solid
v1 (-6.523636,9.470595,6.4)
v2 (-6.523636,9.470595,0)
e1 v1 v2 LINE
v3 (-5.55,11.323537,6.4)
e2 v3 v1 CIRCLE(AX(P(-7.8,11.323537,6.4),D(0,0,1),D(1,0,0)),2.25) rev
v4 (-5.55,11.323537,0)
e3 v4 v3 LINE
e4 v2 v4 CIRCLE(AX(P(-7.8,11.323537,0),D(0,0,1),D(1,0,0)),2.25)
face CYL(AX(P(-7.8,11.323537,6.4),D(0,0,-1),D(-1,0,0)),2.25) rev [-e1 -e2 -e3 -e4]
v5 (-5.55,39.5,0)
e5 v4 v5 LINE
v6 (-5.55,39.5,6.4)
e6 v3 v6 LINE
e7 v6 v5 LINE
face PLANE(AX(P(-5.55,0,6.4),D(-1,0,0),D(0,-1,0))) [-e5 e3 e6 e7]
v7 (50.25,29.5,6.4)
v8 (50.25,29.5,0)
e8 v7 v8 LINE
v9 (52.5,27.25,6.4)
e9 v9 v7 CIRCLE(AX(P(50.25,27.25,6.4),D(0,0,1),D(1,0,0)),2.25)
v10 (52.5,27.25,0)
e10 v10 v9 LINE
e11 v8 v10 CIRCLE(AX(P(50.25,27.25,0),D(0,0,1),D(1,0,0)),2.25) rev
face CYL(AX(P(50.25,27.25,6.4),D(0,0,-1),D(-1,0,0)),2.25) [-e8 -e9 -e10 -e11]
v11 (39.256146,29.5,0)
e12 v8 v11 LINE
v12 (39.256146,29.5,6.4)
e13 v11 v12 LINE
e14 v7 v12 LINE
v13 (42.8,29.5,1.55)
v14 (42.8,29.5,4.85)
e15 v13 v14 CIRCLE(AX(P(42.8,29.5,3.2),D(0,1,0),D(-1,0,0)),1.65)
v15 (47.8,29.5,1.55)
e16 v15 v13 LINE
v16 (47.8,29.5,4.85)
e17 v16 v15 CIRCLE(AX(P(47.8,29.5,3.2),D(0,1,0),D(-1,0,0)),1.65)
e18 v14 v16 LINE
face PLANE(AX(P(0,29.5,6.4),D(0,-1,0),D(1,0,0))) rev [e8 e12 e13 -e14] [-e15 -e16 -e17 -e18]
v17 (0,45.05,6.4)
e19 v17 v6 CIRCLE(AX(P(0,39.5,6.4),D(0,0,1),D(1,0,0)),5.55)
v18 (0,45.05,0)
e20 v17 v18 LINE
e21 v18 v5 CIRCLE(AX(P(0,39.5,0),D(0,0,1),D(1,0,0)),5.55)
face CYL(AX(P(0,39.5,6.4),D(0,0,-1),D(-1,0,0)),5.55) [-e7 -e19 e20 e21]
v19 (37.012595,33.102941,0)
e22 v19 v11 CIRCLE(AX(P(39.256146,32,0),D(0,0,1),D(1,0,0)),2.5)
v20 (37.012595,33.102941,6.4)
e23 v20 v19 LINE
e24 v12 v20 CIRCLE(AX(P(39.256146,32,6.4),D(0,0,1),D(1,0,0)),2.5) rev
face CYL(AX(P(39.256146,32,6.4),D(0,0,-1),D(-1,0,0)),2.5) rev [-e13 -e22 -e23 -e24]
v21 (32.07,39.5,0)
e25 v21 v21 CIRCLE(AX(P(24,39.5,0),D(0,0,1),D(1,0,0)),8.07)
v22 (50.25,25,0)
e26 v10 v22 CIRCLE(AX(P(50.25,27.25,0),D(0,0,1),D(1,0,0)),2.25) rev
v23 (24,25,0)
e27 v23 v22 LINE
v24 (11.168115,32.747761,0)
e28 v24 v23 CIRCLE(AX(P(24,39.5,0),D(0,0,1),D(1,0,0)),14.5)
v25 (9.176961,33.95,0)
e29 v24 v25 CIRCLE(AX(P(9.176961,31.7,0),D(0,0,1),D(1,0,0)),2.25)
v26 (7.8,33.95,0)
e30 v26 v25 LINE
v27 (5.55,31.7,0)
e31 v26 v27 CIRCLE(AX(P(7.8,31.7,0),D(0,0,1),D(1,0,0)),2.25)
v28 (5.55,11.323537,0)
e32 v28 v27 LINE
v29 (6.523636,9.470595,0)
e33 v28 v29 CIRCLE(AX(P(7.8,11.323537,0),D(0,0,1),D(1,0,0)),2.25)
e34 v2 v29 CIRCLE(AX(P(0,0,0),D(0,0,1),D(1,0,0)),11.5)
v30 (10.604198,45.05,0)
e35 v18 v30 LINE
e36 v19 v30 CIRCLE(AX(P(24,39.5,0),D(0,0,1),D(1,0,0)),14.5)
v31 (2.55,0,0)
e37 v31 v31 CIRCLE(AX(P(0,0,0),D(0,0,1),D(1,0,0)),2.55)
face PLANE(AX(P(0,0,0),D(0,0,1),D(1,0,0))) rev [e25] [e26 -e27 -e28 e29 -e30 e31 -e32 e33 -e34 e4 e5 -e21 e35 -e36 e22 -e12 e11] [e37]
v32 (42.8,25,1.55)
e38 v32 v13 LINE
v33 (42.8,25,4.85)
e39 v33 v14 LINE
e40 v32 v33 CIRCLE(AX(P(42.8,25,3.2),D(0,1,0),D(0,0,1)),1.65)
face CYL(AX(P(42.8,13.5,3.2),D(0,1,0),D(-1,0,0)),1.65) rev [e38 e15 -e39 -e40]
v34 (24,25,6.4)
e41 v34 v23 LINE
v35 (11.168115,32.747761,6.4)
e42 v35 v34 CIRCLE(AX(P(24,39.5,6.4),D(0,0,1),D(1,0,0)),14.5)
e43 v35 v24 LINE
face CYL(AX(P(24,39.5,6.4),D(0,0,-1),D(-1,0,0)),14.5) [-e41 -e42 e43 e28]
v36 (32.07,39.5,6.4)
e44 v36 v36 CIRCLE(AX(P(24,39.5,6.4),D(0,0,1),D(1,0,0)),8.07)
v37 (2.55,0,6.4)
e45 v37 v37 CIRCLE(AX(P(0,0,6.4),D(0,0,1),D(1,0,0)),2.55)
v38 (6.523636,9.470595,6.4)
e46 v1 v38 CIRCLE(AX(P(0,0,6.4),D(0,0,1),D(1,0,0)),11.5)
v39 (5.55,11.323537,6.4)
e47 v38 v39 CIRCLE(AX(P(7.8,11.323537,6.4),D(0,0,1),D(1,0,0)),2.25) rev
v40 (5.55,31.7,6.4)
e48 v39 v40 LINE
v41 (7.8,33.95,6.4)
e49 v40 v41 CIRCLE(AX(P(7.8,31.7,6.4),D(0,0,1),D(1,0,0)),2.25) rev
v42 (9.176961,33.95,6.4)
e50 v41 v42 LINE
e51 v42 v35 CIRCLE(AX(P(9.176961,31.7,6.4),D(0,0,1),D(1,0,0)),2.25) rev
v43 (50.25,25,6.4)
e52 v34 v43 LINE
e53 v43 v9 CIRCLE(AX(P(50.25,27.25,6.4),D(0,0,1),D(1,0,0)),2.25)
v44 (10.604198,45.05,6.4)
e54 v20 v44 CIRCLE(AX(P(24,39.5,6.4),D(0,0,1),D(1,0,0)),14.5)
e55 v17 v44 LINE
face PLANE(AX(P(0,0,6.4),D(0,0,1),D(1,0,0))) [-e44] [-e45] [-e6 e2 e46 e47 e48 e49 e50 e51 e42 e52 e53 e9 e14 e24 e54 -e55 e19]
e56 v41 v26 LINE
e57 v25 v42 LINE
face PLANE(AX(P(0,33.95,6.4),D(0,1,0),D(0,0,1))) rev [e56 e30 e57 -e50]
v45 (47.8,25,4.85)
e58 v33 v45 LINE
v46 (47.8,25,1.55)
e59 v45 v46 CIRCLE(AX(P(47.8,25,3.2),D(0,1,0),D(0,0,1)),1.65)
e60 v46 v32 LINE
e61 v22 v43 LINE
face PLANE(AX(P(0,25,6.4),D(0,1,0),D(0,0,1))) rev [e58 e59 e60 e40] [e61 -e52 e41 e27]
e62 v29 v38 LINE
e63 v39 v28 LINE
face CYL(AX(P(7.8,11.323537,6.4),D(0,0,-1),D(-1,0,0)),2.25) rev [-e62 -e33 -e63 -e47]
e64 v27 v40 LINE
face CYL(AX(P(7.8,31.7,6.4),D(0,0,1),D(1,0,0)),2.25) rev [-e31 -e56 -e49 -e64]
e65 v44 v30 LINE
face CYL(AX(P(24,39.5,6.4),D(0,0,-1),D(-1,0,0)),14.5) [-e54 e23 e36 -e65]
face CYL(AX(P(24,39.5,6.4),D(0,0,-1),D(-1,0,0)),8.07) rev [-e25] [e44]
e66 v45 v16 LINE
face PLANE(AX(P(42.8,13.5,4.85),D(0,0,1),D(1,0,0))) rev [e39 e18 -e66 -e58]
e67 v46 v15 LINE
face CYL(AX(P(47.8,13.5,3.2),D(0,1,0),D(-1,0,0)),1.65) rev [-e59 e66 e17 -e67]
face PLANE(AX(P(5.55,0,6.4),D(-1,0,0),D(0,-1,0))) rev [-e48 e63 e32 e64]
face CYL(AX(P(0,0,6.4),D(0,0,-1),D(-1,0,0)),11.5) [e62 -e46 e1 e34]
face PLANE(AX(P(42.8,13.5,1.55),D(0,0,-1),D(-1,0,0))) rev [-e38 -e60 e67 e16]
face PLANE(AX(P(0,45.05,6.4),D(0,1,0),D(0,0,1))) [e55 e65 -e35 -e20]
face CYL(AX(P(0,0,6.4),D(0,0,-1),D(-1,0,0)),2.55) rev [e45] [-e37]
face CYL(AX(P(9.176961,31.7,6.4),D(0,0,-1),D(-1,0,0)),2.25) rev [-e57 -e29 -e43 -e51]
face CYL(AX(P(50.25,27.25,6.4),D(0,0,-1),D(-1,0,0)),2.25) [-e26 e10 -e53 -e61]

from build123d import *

# Parameters (mm, degrees)
SKETCH1_R           = 2.55
SKETCH1_R_2         = 8.07
BOSS_EXTRUDE3_DEPTH = 6.4
CUT_EXTRUDE1_DEPTH  = 16
FILLET1_R           = 2.5
FILLET2_R           = 2.25


with BuildPart() as part:
    # Sketch1 → Boss-Extrude3 (new body)
    with BuildSketch(Plane.XY):
        with BuildLine():
            ThreePointArc((-5.55, 10.072114972), (0, -11.5), (5.55, 10.072114972))
            Line((5.55, 10.072114972), (5.55, 33.95))
            Line((5.55, 33.95), (10.604198419, 33.95))
            ThreePointArc((10.604198419, 33.95), (15.944722227, 27.443362824), (24, 25))
            Line((24, 25), (52.5, 25))
            Line((52.5, 25), (52.5, 29.5))
            Line((52.5, 29.5), (34.5, 29.5))
            ThreePointArc((34.5, 29.5), (31.908668769, 51.65331059), (10.604198419, 45.05))
            Line((10.604198419, 45.05), (0, 45.05))
            ThreePointArc((0, 45.05), (-3.924442636, 43.424442636), (-5.55, 39.5))
            Line((-5.55, 39.5), (-5.55, 10.072114972))
        make_face()
        Circle(SKETCH1_R, mode=Mode.SUBTRACT)
        with Locations((24, 39.5)):
            Circle(SKETCH1_R_2, mode=Mode.SUBTRACT)
    extrude(amount=BOSS_EXTRUDE3_DEPTH)

    # Sketch2 → Cut-Extrude1 (cut)
    with BuildSketch(Plane(origin=(0, 29.5, 0), x_dir=(1, 0, 0), z_dir=(0, 1, 0))):
        with BuildLine():
            Line((42.8, -1.55), (47.8, -1.55))
            ThreePointArc((47.8, -1.55), (49.45, -3.2), (47.8, -4.85))
            Line((47.8, -4.85), (42.8, -4.85))
            ThreePointArc((42.8, -4.85), (41.15, -3.2), (42.8, -1.55))
        make_face()
    extrude(amount=-CUT_EXTRUDE1_DEPTH, mode=Mode.SUBTRACT)

    # Fillet1
    fillet1_edges = [part.edges().sort_by_distance(p)[0] for p in [
        (34.5, 29.5, 3.2),
    ]]
    fillet(fillet1_edges, radius=FILLET1_R)

    # Fillet2
    fillet2_edges = [part.edges().sort_by_distance(p)[0] for p in [
        (10.604198419, 33.95, 3.2),
        (-5.55, 10.072114972, 3.2),
        (5.55, 10.072114972, 3.2),
        (5.55, 33.95, 3.2),
        (52.5, 25, 3.2),
        (52.5, 29.5, 3.2),
    ]]
    fillet(fillet2_edges, radius=FILLET2_R - 0.0001)  # a hair under: the kernel refuses the full size


solid = part.part
